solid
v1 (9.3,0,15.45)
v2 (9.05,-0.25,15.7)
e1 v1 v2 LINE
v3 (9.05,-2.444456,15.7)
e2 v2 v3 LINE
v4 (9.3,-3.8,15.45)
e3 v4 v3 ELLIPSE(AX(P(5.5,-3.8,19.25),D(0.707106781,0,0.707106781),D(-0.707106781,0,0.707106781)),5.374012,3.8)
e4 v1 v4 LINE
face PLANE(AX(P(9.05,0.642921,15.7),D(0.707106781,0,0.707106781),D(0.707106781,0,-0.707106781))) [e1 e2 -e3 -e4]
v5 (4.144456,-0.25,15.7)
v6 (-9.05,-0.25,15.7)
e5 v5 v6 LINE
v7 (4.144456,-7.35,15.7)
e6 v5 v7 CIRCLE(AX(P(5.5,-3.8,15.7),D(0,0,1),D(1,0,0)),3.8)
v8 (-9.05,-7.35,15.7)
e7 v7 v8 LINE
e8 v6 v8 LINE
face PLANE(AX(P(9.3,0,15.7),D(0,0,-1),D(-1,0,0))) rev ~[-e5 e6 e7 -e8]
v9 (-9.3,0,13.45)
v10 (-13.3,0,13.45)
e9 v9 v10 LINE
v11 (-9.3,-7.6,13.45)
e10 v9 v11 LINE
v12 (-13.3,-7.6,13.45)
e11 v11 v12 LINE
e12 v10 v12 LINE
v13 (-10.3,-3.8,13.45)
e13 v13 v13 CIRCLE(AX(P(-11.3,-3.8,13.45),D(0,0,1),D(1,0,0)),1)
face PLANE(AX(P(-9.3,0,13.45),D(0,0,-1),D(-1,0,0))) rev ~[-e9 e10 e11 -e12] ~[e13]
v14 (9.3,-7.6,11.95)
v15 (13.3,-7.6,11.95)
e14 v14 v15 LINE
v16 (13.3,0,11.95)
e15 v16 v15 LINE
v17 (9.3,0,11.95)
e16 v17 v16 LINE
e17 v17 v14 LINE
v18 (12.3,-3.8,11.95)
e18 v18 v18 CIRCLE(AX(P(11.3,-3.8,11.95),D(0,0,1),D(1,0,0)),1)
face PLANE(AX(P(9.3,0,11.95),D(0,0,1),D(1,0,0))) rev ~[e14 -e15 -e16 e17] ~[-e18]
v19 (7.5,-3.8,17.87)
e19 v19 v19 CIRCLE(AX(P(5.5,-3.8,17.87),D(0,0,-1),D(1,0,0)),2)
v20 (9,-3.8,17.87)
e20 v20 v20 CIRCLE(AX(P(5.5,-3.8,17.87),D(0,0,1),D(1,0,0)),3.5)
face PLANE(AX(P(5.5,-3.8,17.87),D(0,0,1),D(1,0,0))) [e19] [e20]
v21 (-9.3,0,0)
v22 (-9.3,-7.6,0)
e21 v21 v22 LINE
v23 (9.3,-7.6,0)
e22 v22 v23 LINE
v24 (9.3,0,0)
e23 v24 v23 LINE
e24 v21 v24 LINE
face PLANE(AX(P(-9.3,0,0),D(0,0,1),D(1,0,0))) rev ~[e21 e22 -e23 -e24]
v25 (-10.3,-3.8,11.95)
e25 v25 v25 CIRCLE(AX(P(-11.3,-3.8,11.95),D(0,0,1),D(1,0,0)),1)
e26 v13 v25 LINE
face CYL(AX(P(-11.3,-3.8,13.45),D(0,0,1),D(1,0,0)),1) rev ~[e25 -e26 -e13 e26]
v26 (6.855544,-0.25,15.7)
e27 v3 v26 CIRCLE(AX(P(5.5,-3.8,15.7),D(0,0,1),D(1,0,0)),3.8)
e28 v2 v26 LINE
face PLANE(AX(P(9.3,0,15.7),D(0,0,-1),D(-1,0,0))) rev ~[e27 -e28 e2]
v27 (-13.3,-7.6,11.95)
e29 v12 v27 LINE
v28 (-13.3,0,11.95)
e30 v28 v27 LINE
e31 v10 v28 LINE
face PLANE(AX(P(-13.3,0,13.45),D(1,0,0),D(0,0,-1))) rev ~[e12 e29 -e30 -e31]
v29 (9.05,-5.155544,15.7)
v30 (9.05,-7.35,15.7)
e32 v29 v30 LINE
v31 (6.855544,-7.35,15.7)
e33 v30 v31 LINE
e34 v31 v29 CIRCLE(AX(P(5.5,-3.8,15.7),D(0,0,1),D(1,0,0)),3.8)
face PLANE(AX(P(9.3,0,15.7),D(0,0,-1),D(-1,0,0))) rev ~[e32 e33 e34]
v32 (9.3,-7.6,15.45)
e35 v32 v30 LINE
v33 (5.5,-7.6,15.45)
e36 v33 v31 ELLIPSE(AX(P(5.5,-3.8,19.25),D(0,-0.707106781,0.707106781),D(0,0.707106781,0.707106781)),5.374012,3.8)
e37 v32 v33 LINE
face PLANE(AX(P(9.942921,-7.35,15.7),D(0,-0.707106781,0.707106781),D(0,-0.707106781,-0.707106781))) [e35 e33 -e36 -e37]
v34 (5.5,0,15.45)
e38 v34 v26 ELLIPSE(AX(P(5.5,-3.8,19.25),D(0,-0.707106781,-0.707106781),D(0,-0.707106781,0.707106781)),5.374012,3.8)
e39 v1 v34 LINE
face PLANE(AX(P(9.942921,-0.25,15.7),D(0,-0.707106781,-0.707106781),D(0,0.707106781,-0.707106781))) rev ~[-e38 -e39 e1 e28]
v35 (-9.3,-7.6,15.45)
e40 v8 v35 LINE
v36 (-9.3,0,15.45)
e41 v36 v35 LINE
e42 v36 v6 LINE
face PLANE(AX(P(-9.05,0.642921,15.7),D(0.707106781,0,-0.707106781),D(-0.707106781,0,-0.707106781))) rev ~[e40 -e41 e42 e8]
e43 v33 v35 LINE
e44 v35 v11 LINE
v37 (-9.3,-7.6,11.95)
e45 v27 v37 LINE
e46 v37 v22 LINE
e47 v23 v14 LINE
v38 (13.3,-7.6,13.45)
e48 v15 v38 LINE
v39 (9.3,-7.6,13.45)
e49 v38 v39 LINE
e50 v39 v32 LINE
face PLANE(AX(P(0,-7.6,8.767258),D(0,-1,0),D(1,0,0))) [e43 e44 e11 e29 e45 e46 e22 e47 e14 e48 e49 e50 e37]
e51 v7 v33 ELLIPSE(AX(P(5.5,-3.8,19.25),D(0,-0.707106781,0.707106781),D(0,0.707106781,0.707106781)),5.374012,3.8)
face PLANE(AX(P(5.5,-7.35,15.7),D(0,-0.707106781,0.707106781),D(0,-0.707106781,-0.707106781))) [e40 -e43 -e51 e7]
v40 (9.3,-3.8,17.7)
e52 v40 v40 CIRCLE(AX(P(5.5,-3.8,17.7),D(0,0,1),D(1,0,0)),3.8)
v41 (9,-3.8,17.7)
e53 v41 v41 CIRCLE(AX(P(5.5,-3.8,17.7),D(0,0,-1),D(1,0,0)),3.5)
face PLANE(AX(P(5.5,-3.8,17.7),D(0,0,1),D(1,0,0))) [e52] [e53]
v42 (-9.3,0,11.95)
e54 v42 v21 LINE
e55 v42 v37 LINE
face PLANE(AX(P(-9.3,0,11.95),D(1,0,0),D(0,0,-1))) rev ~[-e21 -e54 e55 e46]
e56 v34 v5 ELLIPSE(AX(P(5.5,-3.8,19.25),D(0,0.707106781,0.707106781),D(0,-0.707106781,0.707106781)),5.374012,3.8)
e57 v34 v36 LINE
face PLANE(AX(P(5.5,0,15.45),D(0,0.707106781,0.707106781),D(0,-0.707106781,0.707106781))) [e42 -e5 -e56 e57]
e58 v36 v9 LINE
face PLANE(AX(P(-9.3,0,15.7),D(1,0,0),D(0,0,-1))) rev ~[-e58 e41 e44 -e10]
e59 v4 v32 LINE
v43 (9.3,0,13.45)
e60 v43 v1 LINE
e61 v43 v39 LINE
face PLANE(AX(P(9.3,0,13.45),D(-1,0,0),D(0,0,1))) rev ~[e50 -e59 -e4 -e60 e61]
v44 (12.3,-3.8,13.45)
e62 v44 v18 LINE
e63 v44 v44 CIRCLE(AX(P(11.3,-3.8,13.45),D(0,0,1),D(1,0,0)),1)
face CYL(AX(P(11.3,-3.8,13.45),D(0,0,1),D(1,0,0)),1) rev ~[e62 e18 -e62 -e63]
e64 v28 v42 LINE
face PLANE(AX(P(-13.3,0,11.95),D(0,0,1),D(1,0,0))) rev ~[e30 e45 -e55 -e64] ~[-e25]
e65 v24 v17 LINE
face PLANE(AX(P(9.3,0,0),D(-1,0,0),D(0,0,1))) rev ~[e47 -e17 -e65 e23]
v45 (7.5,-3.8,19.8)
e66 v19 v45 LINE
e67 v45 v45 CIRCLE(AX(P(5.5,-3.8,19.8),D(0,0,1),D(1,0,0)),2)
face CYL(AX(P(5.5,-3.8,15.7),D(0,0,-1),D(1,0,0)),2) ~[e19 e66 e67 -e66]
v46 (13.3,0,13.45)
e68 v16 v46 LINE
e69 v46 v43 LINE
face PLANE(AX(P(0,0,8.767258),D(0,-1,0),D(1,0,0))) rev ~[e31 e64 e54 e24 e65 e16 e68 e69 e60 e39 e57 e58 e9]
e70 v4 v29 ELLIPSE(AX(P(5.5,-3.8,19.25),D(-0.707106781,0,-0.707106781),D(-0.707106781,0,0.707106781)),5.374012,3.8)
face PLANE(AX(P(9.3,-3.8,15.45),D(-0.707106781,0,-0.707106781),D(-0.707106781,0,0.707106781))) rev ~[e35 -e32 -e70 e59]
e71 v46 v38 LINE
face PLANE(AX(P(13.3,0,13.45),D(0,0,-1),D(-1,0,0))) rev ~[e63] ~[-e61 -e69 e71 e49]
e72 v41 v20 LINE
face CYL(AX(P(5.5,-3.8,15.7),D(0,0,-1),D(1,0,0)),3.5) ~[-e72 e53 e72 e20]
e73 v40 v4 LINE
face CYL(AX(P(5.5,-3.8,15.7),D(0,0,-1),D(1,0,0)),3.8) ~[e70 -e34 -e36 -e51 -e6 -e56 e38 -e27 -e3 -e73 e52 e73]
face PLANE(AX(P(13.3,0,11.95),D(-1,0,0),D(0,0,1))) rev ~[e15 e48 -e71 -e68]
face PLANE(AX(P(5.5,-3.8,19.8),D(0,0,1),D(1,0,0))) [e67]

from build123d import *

# Parameters (mm, degrees)
F1_DEPTH     = 7.6
F2_R         = 1
F3_DEPTH     = 13.451
F4_R         = 3.8
F4_R_2       = 3.5
F4_R_3       = 2
F5_DEPTH     = 2
F6_DEPTH     = 2.17
F7_DEPTH     = 4.1
F8_T1_DEPTH  = 8.885841494
F8_T6_DEPTH  = 15.442920747
F8_S7_R      = 3.8
F8_T8_DEPTH  = 9
F8_T12_DEPTH = 15.442920747
F8_S13_R     = 3.8
F8_T14_DEPTH = 9
F8_T18_DEPTH = 4.442920747
F8_S19_R     = 3.8
F8_T20_DEPTH = 4
F8_T24_DEPTH = 4.442920747
F8_S25_R     = 3.8
F8_T26_DEPTH = 4
F8_T30_DEPTH = 4.442920747
F8_S31_R     = 3.8
F8_T32_DEPTH = 4
F8_T36_DEPTH = 4.442920747
F8_S37_R     = 3.8
F8_T38_DEPTH = 4


# Not quite as in the source:
# - a fillet or chamfer that OpenCascade refuses, or shapes differently, is made with other operations: its cross-section is extruded or revolved along the edge and cut away or added


with BuildPart() as f1:
    # F0 (on Front) → F1 (new body)
    with BuildSketch(Plane.XZ):
        Polygon((9.3, 15.7), (-9.3, 15.7), (-9.3, 13.45), (-13.3, 13.45), (-13.3, 11.95), (-9.3, 11.95), (-9.3, 0), (9.3, 0), (9.3, 11.95), (13.3, 11.95), (13.3, 13.45), (9.3, 13.45), align=None)
    extrude(amount=F1_DEPTH)

    # F2 (on face) → F3 (cut, through all)
    with BuildSketch(Plane.XY.offset(13.45)):
        with Locations((-11.3, -3.8)):
            Circle(F2_R)
        with Locations((11.3, -3.8)):
            Circle(F2_R)
    extrude(amount=-F3_DEPTH, mode=Mode.SUBTRACT)

    # F4 (on face) → F5 (join)
    with BuildSketch(Plane.XY.offset(15.7)):
        with Locations((5.5, -3.8)):
            Circle(F4_R)
        with Locations((5.5, -3.8)):
            Circle(F4_R_2, mode=Mode.SUBTRACT)
        with Locations((5.5, -3.8)):
            Circle(F4_R_2)
        with Locations((5.5, -3.8)):
            Circle(F4_R_3, mode=Mode.SUBTRACT)
        with Locations((5.5, -3.8)):
            Circle(F4_R_3)
    extrude(amount=F5_DEPTH)

    # F4 (on face) → F6 (join)
    with BuildSketch(Plane.XY.offset(15.7)):
        with Locations((5.5, -3.8)):
            Circle(F4_R_2)
        with Locations((5.5, -3.8)):
            Circle(F4_R_3, mode=Mode.SUBTRACT)
        with Locations((5.5, -3.8)):
            Circle(F4_R_3)
    extrude(amount=F6_DEPTH)

    # F4 (on face) → F7 (join)
    with BuildSketch(Plane.XY.offset(15.7)):
        with Locations((5.5, -3.8)):
            Circle(F4_R_3)
    extrude(amount=F7_DEPTH)

    # F8: chamfer of 0.25 on 7 edges, made by hand

    # F8_s2 → F8_t1 (cut)
    with BuildSketch(Plane.XZ.offset(-0.642920747)):
        Polygon((-9.05, 15.7), (-9.3, 15.45), (-9.3, 15.7), align=None)
    extrude(amount=F8_T1_DEPTH, mode=Mode.SUBTRACT)


with BuildPart() as f8_tool4:
    # F8_s5 → F8_t6 (new body)
    with BuildSketch(Plane.YZ.offset(5.5)):
        Polygon((-7.35, 15.7), (-7.6, 15.45), (-7.6, 15.7), align=None)
    extrude(amount=-F8_T6_DEPTH)

    # F8_s7 → F8_t8 (cut, symmetric)
    with BuildSketch(Plane.XY.offset(15.6)):
        with Locations((5.5, -3.8)):
            Circle(F8_S7_R)
    extrude(amount=F8_T8_DEPTH, both=True, mode=Mode.SUBTRACT)


with BuildPart() as f1_1:
    add(f1.part)

    # F8_t3: cut F8_tool4
    add(f8_tool4.part, mode=Mode.SUBTRACT)


with BuildPart() as f8_tool10:
    # F8_s11 → F8_t12 (new body)
    with BuildSketch(Plane.YZ.offset(5.5)):
        Polygon((0, 15.45), (-0.25, 15.7), (0, 15.7), align=None)
    extrude(amount=-F8_T12_DEPTH)

    # F8_s13 → F8_t14 (cut, symmetric)
    with BuildSketch(Plane.XY.offset(15.6)):
        with Locations((5.5, -3.8)):
            Circle(F8_S13_R)
    extrude(amount=F8_T14_DEPTH, both=True, mode=Mode.SUBTRACT)


with BuildPart() as f1_2:
    add(f1_1.part)

    # F8_t9: cut F8_tool10
    add(f8_tool10.part, mode=Mode.SUBTRACT)


with BuildPart() as f8_tool16:
    # F8_s17 → F8_t18 (new body)
    with BuildSketch(Plane.XZ.offset(3.8)):
        Polygon((9.3, 15.45), (9.05, 15.7), (9.3, 15.7), align=None)
    extrude(amount=F8_T18_DEPTH)

    # F8_s19 → F8_t20 (cut, symmetric)
    with BuildSketch(Plane.XY.offset(15.6)):
        with Locations((5.5, -3.8)):
            Circle(F8_S19_R)
    extrude(amount=F8_T20_DEPTH, both=True, mode=Mode.SUBTRACT)


with BuildPart() as f1_3:
    add(f1_2.part)

    # F8_t15: cut F8_tool16
    add(f8_tool16.part, mode=Mode.SUBTRACT)


with BuildPart() as f8_tool22:
    # F8_s23 → F8_t24 (new body)
    with BuildSketch(Plane.YZ.offset(9.942920747)):
        Polygon((-0.25, 15.7), (0, 15.45), (0, 15.7), align=None)
    extrude(amount=-F8_T24_DEPTH)

    # F8_s25 → F8_t26 (cut, symmetric)
    with BuildSketch(Plane.XY.offset(15.6)):
        with Locations((5.5, -3.8)):
            Circle(F8_S25_R)
    extrude(amount=F8_T26_DEPTH, both=True, mode=Mode.SUBTRACT)


with BuildPart() as f1_4:
    add(f1_3.part)

    # F8_t21: cut F8_tool22
    add(f8_tool22.part, mode=Mode.SUBTRACT)


with BuildPart() as f8_tool28:
    # F8_s29 → F8_t30 (new body)
    with BuildSketch(Plane.XZ.offset(-0.642920747)):
        Polygon((9.05, 15.7), (9.3, 15.45), (9.3, 15.7), align=None)
    extrude(amount=F8_T30_DEPTH)

    # F8_s31 → F8_t32 (cut, symmetric)
    with BuildSketch(Plane.XY.offset(15.6)):
        with Locations((5.5, -3.8)):
            Circle(F8_S31_R)
    extrude(amount=F8_T32_DEPTH, both=True, mode=Mode.SUBTRACT)


with BuildPart() as f1_5:
    add(f1_4.part)

    # F8_t27: cut F8_tool28
    add(f8_tool28.part, mode=Mode.SUBTRACT)


with BuildPart() as f8_tool34:
    # F8_s35 → F8_t36 (new body)
    with BuildSketch(Plane.YZ.offset(9.942920747)):
        Polygon((-7.35, 15.7), (-7.6, 15.45), (-7.6, 15.7), align=None)
    extrude(amount=-F8_T36_DEPTH)

    # F8_s37 → F8_t38 (cut, symmetric)
    with BuildSketch(Plane.XY.offset(15.6)):
        with Locations((5.5, -3.8)):
            Circle(F8_S37_R)
    extrude(amount=F8_T38_DEPTH, both=True, mode=Mode.SUBTRACT)


with BuildPart() as f1_6:
    add(f1_5.part)

    # F8_t33: cut F8_tool34
    add(f8_tool34.part, mode=Mode.SUBTRACT)


solid = f1_6.part
